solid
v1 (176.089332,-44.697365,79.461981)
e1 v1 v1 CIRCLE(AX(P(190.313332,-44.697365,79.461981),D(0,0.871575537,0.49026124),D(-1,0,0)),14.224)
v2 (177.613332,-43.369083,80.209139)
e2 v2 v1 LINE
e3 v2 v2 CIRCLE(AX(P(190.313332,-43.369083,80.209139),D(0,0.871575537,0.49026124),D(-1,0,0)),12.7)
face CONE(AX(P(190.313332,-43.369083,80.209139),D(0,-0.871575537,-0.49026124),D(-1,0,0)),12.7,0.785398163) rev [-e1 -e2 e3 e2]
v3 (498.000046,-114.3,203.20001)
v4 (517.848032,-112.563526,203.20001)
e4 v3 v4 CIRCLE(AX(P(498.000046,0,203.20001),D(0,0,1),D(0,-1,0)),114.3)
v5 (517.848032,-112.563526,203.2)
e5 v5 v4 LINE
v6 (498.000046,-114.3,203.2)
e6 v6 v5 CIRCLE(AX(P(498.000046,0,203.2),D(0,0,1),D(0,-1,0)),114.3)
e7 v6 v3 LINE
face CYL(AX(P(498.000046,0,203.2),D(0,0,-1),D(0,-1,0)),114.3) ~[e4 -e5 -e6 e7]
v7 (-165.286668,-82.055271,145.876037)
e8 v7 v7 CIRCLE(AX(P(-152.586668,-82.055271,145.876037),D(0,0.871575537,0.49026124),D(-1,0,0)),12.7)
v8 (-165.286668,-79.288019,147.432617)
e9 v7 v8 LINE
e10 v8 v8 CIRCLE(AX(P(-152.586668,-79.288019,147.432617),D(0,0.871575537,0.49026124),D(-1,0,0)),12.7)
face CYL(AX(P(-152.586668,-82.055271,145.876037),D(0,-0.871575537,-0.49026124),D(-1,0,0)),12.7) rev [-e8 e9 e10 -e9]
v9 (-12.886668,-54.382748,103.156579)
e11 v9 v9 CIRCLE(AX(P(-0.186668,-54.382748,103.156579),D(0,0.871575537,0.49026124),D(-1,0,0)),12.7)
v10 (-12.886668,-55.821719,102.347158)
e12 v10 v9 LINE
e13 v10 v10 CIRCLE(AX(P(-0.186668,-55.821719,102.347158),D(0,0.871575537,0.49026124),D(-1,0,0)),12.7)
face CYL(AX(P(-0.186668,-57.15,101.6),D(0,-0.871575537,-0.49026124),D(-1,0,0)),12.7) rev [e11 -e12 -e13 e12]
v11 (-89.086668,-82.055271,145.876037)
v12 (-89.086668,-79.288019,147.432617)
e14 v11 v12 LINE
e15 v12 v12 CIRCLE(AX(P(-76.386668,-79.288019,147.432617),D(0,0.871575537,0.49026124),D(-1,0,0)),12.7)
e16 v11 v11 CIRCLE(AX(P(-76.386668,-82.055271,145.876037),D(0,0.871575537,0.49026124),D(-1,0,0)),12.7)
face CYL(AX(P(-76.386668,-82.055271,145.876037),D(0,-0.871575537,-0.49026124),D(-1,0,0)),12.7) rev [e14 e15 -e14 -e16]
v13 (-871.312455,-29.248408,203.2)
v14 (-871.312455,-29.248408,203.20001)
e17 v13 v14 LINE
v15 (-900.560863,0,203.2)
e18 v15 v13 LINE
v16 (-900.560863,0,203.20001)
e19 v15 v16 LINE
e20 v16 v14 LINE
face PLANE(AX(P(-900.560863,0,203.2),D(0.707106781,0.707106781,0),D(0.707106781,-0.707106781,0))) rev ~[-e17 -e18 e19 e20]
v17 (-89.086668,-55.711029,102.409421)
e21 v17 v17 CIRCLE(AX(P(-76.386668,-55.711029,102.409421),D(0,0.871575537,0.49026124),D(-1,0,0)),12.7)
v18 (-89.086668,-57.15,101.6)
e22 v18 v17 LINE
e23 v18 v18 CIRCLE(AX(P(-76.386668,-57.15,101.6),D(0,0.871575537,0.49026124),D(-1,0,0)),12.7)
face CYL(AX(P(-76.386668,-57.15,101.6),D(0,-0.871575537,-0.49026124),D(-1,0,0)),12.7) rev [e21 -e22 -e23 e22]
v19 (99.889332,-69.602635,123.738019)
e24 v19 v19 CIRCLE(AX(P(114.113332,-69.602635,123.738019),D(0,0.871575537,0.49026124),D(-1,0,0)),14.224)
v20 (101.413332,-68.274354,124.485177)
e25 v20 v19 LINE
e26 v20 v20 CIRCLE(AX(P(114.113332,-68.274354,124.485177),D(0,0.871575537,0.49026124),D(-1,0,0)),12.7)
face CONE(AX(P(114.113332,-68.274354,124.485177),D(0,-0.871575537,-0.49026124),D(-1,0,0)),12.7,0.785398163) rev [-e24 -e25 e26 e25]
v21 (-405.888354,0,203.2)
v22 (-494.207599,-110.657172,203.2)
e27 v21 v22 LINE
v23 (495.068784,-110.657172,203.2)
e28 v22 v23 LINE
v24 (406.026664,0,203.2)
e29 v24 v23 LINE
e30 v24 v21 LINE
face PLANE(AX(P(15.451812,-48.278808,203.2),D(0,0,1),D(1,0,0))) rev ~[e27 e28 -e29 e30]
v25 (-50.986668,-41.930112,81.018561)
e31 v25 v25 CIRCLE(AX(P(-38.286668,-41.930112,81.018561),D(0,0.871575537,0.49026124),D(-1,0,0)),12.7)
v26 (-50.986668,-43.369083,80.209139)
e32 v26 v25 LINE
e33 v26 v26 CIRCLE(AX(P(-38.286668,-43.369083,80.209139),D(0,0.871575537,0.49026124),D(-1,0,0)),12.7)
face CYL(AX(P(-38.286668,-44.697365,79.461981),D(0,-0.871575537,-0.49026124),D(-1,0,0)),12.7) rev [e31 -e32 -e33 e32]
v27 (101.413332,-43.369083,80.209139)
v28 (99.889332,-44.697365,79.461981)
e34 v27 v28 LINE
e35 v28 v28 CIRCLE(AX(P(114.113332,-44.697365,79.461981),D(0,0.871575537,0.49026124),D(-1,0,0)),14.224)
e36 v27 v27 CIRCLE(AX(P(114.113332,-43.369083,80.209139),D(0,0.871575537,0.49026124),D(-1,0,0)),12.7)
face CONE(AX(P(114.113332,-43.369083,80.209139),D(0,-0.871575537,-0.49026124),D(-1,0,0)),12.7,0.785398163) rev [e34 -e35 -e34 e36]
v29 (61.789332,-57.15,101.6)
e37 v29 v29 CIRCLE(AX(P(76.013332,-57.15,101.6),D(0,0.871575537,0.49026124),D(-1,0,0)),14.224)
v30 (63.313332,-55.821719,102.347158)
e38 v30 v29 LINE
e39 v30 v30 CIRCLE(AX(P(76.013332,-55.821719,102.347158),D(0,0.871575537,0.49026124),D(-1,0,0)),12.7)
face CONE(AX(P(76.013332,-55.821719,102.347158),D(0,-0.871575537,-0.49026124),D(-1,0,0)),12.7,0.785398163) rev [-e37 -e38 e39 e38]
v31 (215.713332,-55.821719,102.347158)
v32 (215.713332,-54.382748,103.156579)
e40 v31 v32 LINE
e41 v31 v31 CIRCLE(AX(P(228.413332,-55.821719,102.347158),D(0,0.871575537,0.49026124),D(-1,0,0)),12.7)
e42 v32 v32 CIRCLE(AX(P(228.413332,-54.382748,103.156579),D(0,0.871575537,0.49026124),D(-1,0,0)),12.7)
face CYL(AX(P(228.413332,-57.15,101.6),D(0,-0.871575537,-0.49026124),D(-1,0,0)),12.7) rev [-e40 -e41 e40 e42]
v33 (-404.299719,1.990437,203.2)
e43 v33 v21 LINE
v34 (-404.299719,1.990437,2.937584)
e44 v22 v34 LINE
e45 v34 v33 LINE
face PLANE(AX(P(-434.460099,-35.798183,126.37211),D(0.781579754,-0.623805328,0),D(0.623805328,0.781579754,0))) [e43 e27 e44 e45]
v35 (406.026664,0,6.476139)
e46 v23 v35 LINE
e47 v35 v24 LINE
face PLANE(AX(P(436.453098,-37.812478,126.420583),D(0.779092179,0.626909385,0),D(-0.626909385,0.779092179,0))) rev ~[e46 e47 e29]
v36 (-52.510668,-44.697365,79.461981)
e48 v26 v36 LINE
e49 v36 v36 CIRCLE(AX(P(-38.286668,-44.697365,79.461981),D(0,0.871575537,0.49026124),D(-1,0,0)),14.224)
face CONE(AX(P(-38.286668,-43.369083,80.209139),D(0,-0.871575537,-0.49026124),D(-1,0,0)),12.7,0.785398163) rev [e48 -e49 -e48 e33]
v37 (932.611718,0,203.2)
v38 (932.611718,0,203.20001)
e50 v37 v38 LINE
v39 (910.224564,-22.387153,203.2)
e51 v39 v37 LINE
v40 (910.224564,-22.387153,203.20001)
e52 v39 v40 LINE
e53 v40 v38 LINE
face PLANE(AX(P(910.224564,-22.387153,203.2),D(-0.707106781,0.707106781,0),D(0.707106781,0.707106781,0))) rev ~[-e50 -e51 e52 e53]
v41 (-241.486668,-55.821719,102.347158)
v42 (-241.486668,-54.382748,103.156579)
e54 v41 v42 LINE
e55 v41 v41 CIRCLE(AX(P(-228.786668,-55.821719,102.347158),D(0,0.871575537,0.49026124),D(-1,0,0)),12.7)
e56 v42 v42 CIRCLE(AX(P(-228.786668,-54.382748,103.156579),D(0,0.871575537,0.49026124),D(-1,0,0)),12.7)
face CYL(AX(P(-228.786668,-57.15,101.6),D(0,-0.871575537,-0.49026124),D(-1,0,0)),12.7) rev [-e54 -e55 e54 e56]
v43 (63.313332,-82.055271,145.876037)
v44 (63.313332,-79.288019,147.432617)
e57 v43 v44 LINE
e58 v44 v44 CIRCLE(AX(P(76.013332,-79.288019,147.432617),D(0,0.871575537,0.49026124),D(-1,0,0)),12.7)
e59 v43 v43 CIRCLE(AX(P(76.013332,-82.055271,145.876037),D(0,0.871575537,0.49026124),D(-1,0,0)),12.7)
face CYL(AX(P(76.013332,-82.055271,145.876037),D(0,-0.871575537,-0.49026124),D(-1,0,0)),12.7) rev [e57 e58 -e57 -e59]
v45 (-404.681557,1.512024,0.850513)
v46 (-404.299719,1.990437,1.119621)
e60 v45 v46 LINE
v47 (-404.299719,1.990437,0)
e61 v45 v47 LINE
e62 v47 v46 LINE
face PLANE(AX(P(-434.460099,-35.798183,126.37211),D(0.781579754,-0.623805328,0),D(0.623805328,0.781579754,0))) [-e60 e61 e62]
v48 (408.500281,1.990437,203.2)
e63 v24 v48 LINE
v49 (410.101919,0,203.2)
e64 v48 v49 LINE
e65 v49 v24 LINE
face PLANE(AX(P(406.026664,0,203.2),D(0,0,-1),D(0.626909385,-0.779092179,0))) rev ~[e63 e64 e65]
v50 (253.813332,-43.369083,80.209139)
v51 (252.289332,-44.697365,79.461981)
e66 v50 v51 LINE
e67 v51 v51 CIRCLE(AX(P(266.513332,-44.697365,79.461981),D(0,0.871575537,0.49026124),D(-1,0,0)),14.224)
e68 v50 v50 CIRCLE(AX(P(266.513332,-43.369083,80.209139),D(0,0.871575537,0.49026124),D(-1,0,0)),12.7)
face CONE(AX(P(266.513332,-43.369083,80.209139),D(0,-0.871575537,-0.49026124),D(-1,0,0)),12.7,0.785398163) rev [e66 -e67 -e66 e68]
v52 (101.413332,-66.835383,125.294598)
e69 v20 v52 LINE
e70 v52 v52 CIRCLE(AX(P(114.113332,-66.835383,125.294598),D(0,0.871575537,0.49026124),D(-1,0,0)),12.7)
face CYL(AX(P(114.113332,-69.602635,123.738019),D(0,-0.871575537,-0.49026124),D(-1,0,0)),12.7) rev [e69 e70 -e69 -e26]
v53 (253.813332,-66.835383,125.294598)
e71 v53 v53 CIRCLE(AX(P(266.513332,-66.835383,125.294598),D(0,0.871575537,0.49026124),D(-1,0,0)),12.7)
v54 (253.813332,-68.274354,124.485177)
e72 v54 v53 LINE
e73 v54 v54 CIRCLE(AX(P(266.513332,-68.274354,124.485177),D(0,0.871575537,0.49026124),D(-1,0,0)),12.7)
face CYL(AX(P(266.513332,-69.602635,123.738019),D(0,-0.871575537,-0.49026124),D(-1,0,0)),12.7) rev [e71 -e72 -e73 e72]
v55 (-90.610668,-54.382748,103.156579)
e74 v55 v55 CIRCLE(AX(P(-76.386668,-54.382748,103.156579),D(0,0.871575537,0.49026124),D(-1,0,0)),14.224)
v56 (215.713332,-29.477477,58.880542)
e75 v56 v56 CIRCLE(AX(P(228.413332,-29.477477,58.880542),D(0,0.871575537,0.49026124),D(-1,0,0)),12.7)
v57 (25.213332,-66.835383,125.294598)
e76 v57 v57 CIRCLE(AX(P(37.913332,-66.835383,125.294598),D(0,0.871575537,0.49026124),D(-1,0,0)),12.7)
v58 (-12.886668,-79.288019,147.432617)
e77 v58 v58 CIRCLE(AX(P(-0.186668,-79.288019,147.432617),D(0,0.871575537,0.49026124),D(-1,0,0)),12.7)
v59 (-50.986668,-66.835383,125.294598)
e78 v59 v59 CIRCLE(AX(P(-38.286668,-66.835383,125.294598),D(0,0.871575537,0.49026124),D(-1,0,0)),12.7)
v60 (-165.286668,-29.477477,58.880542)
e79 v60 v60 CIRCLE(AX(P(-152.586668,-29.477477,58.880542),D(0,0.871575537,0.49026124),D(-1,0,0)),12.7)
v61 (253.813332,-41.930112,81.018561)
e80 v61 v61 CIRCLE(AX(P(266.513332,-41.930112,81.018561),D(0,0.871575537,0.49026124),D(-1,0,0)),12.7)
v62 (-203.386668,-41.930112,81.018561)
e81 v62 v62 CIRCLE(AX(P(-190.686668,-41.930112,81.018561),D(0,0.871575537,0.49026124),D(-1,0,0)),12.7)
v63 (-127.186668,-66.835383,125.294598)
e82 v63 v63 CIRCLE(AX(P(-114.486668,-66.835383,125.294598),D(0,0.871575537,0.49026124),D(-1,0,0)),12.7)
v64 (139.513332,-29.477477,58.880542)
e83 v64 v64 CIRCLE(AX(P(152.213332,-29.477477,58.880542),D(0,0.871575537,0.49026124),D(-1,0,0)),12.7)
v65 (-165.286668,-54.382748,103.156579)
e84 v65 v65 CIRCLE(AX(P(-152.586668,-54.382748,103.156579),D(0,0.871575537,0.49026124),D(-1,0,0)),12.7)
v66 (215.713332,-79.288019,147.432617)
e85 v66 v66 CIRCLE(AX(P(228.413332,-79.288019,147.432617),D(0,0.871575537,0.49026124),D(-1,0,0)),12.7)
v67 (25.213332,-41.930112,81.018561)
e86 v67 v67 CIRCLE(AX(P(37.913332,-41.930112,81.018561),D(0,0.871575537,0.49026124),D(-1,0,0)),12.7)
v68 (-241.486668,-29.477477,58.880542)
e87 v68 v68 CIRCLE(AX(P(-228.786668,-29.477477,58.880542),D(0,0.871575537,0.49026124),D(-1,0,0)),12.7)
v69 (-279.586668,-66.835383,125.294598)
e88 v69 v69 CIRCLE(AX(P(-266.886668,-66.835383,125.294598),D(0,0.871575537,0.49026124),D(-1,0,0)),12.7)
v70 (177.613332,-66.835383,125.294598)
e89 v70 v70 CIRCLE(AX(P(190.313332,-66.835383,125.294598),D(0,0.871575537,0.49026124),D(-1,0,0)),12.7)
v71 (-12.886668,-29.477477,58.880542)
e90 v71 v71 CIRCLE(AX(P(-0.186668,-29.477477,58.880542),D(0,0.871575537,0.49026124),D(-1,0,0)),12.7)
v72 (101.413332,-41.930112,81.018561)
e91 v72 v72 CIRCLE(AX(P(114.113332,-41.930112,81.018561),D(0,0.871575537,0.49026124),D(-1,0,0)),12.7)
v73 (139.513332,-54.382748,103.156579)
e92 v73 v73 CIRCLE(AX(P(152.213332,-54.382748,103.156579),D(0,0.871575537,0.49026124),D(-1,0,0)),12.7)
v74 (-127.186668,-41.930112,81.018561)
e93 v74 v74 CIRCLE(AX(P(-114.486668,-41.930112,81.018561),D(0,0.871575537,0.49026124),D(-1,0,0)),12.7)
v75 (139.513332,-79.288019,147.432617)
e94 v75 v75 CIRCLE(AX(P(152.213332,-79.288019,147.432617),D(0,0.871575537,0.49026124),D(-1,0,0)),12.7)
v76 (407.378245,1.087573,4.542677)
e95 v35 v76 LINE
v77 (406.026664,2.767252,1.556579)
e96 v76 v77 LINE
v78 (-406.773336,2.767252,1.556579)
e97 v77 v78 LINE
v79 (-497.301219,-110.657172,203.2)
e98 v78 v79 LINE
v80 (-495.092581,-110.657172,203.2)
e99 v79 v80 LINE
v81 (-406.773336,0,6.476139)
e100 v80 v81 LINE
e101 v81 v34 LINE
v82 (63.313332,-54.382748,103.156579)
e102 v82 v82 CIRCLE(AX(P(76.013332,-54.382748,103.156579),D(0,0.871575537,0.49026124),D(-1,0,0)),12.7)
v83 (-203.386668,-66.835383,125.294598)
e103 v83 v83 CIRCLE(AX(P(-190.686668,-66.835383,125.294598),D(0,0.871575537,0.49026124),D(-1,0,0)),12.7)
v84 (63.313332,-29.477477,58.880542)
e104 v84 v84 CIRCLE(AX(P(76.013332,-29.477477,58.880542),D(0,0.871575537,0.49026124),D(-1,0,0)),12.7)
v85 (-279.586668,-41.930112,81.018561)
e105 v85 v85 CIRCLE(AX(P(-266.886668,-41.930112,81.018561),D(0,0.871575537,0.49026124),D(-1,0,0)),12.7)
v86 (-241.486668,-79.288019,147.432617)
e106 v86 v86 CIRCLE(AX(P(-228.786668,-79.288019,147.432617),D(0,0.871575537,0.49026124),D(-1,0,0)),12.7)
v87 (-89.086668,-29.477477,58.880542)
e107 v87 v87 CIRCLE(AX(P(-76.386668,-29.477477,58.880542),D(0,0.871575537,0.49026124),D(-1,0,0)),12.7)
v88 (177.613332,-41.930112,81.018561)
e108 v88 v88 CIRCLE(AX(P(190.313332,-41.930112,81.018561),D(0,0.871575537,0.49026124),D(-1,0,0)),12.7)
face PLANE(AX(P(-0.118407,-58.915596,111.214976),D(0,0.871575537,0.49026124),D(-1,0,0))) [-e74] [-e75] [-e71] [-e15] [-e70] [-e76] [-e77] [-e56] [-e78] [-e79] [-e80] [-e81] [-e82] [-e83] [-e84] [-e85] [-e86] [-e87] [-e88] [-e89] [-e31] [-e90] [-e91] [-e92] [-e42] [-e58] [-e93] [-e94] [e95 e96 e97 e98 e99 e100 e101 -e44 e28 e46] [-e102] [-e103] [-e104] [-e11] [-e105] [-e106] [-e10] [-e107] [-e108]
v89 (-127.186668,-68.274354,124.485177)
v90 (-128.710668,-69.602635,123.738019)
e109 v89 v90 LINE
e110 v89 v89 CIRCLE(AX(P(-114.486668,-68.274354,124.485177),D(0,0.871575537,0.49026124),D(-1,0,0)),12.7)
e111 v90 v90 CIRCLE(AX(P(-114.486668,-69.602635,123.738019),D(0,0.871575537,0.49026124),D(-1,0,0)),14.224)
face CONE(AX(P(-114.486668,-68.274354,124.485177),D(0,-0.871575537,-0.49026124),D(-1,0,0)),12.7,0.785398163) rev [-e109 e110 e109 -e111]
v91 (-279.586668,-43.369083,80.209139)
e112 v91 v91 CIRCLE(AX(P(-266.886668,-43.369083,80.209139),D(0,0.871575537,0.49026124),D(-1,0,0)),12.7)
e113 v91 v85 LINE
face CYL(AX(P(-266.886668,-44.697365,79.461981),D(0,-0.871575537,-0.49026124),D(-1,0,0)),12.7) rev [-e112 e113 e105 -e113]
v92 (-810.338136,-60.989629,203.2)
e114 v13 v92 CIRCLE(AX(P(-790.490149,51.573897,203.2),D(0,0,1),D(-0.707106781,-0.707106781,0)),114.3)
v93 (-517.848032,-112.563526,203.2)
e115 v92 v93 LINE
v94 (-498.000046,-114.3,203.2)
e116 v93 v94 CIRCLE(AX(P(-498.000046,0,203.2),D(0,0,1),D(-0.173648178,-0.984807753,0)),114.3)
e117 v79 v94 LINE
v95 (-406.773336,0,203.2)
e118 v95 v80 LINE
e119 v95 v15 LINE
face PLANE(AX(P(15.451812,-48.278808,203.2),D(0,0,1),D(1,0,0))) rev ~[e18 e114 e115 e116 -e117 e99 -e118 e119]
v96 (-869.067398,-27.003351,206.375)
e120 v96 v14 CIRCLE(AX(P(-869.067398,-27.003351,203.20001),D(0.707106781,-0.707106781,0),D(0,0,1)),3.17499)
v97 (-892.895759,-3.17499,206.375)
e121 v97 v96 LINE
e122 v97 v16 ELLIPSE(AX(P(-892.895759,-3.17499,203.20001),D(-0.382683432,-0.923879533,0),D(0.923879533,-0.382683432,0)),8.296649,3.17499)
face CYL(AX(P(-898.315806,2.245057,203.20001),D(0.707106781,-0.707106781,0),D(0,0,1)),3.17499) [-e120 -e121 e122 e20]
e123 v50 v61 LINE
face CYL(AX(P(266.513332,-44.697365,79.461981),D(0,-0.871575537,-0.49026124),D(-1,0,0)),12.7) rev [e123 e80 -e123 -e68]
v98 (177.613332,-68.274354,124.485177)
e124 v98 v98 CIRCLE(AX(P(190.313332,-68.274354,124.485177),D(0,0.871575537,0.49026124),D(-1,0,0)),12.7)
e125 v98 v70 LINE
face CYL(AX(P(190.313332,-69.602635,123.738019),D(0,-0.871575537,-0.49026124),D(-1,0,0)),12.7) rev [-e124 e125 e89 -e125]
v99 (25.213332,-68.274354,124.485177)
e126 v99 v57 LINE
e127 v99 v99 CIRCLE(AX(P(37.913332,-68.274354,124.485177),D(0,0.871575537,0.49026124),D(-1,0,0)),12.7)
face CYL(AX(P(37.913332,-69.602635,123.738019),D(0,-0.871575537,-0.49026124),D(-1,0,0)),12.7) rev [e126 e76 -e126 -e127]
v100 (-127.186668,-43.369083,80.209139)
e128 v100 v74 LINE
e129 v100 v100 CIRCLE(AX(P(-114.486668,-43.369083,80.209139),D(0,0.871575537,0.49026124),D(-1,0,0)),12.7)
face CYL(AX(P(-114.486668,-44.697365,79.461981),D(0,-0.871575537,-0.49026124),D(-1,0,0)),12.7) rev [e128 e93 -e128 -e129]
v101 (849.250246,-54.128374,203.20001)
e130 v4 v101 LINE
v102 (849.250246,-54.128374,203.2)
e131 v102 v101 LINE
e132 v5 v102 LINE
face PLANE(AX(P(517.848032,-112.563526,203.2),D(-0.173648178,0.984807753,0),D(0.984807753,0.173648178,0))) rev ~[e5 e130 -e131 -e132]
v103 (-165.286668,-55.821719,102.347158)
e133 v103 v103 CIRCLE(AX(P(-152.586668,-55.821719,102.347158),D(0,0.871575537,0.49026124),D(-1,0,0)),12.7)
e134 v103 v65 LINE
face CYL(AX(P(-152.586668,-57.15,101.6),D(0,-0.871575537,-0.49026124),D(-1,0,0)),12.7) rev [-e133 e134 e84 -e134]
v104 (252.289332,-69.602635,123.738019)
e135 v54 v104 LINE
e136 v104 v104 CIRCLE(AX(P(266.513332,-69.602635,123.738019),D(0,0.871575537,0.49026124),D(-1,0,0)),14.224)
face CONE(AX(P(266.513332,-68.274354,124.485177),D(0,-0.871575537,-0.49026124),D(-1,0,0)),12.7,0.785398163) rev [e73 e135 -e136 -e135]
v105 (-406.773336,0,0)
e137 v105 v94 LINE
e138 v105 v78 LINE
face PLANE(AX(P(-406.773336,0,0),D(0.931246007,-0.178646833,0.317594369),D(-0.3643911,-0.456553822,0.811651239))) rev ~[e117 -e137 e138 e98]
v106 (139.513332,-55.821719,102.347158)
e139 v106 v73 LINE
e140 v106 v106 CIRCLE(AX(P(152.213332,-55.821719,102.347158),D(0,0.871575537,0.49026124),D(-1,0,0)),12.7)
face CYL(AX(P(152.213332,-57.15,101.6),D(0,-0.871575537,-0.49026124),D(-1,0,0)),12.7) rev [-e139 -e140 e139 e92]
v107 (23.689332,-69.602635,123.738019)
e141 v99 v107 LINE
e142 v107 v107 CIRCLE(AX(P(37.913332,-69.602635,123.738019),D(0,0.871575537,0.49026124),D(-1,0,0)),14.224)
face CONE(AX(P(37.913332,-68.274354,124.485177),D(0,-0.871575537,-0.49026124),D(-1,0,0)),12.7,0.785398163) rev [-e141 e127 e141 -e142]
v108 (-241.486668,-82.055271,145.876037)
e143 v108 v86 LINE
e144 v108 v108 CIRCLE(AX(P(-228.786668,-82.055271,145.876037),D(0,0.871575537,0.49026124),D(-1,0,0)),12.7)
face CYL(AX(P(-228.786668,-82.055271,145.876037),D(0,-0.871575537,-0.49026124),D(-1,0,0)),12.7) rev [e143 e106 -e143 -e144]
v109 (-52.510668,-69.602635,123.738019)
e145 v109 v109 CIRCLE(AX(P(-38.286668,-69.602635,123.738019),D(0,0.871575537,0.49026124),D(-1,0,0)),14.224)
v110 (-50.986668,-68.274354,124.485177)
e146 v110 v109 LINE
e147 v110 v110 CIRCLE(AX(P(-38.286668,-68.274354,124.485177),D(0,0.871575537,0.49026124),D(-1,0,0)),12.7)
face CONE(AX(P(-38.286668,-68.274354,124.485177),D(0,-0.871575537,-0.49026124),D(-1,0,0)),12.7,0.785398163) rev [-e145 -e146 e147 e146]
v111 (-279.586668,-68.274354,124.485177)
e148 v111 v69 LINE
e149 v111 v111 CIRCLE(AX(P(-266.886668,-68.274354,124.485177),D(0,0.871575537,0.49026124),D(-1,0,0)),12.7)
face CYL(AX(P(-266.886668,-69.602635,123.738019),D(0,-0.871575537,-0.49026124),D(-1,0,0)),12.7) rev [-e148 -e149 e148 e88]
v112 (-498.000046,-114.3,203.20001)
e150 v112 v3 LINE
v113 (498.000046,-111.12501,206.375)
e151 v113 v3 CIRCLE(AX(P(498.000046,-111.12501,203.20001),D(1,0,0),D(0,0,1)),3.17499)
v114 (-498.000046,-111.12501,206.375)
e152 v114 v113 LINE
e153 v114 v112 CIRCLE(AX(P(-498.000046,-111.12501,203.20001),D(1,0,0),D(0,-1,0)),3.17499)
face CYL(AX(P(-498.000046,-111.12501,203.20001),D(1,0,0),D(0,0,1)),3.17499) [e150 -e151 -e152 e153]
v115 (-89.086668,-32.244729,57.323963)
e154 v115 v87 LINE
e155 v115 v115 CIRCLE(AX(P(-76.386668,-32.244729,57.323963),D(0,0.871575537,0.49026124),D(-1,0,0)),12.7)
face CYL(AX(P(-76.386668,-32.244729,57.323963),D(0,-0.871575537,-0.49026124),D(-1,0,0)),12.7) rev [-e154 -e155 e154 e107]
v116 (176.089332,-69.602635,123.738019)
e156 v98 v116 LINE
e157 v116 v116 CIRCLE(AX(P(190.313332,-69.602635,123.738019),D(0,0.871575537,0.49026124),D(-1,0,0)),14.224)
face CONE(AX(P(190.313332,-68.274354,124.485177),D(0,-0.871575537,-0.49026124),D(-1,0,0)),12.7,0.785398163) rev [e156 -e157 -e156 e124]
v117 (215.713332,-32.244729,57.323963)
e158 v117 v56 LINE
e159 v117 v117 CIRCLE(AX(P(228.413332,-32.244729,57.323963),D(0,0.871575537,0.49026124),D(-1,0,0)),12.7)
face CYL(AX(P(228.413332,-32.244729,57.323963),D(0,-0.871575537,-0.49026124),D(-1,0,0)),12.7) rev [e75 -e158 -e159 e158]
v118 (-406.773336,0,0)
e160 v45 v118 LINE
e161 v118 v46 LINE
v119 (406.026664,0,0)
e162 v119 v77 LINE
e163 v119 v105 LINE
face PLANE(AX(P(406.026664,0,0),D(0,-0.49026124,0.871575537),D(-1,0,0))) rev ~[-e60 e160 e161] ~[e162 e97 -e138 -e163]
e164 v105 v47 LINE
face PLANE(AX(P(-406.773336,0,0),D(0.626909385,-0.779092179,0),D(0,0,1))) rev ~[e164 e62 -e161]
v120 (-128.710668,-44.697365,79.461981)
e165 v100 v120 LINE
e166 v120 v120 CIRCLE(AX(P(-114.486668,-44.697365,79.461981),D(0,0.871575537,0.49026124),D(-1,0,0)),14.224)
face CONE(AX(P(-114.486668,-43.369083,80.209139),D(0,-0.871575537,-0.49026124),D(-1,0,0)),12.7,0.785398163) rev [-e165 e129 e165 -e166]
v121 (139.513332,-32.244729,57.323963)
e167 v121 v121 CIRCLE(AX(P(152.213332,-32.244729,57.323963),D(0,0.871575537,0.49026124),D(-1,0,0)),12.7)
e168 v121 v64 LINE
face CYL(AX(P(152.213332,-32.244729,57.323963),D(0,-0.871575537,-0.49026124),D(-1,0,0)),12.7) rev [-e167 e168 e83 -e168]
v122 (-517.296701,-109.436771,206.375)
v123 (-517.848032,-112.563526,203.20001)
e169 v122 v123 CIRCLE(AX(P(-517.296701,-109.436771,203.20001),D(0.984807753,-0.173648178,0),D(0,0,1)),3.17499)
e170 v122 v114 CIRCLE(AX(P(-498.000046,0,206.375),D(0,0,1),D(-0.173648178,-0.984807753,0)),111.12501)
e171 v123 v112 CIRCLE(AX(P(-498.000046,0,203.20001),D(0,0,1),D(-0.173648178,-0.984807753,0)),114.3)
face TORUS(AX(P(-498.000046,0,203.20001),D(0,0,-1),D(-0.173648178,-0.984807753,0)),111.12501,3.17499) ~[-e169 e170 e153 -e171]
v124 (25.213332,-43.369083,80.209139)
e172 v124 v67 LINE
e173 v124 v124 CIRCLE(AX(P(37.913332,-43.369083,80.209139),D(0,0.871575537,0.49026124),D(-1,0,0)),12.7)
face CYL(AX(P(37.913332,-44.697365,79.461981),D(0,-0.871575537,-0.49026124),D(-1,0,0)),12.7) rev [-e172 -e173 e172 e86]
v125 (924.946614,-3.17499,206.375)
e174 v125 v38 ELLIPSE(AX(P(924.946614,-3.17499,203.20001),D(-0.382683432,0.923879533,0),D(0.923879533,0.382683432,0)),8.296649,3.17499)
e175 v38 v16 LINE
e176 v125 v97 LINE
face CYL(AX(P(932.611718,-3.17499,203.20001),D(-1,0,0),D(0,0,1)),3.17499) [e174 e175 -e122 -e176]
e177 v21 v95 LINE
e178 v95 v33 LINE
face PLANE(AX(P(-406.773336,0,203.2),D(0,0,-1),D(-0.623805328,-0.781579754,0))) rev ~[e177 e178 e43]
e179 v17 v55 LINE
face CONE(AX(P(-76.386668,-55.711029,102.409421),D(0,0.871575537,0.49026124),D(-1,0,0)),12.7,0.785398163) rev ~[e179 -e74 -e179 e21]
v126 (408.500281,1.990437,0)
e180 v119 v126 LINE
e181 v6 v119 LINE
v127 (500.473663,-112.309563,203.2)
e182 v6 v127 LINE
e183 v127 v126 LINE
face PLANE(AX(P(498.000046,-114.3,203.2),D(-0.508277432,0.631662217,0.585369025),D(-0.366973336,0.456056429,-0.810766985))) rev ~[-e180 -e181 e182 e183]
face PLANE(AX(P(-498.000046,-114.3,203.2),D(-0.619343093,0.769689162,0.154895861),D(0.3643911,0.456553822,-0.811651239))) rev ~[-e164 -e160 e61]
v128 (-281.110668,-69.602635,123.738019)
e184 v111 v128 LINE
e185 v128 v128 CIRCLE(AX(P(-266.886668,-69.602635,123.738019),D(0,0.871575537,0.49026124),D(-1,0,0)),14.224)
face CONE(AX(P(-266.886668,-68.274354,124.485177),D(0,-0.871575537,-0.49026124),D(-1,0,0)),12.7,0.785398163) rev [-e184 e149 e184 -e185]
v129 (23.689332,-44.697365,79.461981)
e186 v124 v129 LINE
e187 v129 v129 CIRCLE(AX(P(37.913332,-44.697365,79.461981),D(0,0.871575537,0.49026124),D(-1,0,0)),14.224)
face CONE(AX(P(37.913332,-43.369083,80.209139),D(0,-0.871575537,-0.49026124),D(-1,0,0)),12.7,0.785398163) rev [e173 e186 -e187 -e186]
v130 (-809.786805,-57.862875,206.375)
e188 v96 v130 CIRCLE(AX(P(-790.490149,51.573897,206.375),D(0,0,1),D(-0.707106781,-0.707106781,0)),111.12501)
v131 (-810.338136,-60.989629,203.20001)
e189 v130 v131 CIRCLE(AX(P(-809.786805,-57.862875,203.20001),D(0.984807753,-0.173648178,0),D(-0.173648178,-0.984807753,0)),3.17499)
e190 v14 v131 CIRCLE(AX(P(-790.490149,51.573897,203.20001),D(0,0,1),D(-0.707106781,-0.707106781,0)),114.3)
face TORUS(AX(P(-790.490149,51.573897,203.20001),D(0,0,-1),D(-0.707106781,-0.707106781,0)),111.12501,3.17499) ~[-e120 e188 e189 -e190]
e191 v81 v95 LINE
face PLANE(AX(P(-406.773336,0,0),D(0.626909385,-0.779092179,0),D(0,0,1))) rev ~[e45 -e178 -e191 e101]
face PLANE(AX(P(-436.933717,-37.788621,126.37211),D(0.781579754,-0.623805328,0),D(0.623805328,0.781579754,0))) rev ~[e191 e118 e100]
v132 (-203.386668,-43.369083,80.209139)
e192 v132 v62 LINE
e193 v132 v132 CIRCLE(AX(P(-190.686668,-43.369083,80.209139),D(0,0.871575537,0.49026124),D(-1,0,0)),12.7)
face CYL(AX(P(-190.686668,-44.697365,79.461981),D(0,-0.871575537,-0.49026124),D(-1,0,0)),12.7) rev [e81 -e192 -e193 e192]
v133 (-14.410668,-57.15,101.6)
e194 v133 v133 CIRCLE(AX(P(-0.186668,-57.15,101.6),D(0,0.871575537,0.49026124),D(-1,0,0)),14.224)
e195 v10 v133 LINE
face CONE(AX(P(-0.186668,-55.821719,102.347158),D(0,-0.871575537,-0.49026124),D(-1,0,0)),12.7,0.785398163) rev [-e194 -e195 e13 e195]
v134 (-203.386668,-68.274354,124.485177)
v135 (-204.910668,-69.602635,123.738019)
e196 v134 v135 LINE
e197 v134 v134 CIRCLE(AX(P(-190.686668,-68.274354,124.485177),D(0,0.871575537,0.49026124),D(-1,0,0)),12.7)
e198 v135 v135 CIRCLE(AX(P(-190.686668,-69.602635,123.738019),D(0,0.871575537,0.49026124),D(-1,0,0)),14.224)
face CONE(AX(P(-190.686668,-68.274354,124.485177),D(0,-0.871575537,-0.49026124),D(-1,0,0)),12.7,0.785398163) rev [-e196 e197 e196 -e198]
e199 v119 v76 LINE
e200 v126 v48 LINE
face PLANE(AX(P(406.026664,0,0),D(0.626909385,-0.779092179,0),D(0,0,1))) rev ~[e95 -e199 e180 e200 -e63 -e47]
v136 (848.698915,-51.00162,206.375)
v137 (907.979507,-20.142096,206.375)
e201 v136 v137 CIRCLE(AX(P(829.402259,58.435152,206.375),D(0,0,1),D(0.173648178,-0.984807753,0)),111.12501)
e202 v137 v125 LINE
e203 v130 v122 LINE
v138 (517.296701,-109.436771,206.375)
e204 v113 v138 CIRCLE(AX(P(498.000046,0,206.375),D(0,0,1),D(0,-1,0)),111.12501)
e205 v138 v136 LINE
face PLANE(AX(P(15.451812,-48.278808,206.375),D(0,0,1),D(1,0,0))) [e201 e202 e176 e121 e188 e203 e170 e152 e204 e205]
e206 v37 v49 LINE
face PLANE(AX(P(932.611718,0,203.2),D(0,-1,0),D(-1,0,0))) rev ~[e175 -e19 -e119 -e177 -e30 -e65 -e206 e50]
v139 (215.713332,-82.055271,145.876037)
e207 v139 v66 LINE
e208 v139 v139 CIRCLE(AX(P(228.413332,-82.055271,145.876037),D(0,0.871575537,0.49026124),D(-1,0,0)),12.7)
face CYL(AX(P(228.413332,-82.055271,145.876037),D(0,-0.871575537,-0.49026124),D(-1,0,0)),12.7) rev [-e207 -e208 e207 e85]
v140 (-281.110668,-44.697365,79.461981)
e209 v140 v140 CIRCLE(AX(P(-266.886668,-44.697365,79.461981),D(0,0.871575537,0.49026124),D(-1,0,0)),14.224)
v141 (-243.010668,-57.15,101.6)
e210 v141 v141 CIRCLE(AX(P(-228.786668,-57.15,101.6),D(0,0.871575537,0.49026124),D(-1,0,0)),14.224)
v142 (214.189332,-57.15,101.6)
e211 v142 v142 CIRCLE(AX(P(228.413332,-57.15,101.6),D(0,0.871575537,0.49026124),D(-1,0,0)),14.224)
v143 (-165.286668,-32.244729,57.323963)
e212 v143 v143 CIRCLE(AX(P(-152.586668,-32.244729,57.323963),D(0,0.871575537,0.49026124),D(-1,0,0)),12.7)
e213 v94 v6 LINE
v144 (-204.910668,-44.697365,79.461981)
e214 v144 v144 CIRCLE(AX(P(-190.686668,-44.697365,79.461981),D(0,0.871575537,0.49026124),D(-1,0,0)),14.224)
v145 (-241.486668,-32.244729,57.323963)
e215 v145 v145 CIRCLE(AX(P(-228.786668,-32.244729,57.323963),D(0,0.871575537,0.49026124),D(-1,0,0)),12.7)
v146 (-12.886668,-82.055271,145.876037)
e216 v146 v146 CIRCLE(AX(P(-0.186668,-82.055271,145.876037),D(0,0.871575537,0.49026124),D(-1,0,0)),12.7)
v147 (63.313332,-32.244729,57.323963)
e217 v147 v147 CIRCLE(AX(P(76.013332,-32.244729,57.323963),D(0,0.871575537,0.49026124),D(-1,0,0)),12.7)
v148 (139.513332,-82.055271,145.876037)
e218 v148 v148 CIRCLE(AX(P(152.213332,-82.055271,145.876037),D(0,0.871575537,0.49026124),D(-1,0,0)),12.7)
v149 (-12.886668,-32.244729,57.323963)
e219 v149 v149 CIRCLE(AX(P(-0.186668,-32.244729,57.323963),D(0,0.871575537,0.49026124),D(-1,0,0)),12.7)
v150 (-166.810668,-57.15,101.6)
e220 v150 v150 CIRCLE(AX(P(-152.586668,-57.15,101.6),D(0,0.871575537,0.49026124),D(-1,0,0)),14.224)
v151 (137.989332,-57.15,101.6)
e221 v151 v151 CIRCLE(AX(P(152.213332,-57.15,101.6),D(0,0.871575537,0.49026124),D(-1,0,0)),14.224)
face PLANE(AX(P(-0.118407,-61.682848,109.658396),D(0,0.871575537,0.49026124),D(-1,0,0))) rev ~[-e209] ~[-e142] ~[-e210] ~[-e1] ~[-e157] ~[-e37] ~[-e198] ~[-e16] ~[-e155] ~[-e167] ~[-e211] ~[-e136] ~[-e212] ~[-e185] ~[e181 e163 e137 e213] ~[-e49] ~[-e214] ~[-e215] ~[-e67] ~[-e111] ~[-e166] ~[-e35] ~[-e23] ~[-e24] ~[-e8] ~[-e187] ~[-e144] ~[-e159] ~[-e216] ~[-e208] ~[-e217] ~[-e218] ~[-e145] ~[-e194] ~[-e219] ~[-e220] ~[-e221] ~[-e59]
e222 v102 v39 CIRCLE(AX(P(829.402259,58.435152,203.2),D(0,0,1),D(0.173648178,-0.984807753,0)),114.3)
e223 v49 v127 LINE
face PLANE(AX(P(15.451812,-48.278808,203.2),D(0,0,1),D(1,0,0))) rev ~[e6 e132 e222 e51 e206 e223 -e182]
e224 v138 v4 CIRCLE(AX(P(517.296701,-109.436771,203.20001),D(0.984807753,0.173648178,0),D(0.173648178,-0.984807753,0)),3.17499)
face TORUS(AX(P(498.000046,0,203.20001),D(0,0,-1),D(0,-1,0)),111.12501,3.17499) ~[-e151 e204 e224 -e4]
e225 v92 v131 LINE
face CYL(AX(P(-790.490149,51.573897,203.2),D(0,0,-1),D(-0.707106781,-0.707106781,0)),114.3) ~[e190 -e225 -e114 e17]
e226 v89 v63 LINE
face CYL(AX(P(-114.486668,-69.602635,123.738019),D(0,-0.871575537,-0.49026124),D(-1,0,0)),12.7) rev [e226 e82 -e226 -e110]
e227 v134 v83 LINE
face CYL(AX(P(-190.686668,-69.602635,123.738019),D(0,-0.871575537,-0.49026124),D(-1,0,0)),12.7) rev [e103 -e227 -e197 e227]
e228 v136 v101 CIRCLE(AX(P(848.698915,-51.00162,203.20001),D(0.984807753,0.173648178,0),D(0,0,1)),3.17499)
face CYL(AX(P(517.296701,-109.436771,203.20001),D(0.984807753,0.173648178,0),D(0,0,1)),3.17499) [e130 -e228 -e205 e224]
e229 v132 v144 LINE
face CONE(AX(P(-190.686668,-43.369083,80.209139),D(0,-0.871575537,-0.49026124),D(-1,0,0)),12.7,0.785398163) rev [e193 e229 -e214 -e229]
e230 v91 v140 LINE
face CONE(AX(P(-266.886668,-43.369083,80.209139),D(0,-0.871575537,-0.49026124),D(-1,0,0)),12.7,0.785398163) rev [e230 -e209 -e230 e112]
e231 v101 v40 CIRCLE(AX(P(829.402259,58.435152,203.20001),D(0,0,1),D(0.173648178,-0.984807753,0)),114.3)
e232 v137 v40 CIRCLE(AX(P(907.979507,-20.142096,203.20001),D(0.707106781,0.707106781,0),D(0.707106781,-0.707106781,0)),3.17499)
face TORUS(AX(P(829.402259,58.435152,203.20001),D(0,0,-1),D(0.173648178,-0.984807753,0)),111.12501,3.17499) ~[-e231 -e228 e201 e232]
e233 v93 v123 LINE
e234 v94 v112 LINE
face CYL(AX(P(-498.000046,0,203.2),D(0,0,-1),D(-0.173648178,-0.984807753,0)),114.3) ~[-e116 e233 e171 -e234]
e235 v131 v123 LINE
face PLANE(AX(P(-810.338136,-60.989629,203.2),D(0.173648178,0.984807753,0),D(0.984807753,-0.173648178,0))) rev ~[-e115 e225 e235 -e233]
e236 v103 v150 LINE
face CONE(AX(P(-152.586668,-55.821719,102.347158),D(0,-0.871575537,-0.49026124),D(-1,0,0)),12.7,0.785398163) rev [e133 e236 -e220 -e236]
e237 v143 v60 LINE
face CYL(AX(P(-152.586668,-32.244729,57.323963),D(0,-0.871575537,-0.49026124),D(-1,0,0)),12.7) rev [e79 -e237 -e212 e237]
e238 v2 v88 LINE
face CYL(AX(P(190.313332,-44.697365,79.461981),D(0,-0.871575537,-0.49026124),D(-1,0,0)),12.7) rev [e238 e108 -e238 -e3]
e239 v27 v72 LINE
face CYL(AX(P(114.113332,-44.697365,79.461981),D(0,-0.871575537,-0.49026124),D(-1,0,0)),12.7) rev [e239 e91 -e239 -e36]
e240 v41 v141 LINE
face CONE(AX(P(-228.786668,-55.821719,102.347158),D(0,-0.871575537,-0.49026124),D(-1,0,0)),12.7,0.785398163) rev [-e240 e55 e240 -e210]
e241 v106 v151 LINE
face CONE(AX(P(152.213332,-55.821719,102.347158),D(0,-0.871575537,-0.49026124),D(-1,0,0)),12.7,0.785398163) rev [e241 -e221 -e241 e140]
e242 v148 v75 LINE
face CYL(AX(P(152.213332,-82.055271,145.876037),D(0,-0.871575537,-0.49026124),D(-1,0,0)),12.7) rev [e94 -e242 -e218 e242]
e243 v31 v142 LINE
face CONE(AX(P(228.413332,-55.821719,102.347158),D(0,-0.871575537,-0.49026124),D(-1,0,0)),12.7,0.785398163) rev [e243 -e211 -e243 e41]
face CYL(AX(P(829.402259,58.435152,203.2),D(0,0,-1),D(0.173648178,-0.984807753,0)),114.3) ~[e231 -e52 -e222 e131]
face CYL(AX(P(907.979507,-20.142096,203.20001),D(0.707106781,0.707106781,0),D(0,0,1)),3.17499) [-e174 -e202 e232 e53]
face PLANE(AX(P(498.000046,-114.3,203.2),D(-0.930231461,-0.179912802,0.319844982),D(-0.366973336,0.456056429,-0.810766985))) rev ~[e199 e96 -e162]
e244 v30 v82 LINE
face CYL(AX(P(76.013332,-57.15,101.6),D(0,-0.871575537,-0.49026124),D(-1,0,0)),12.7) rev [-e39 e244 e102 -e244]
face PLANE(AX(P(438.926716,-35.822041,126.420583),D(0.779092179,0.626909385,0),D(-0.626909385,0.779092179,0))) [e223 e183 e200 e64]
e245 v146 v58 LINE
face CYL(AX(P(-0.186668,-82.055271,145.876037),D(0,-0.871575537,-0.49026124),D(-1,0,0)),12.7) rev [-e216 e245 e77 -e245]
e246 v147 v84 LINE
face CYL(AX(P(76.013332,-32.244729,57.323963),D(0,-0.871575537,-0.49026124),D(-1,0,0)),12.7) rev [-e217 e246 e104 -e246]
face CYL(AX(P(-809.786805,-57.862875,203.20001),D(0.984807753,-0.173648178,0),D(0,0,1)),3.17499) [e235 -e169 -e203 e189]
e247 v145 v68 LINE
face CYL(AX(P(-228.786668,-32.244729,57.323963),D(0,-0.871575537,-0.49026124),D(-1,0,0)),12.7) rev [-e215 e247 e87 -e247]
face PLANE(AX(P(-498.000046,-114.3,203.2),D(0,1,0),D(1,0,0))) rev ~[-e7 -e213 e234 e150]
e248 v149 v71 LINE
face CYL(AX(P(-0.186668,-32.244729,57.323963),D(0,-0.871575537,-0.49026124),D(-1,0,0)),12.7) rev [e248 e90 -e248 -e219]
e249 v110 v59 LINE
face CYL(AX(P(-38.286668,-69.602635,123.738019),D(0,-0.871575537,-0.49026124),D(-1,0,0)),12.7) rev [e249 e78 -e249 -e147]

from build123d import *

# Parameters (mm, degrees)
F9_R      = 12.7
F10_DEPTH = 3.175
F11_SIZE  = 1.524
F12_DEPTH = 3.175
F13_R     = 3.17499
F14_DEPTH = 3.175


# Not quite as in the source:
# - a fillet or chamfer is up to 0.001 mm smaller than in the source, because OpenCascade refuses the exact size


with BuildPart() as f10:
    # F9 (on 3pt) → F10 (new body)
    with BuildSketch(Plane(origin=(0, 0, 0), x_dir=(-1, 0, 0), z_dir=(0, 0.8715755371, 0.4902612396))):
        Polygon((-406.0266635338, 0), (406.7733364662, 0), (498.000045759, 233.1410088337), (-498.000045759, 233.1410088337), align=None)
        with Locations((-266.5133317669, 91.1705044169)):
            Circle(F9_R, mode=Mode.SUBTRACT)
        with Locations((-228.4133317669, 65.7705044169)):
            Circle(F9_R, mode=Mode.SUBTRACT)
        with Locations((-152.2133317669, 65.7705044169)):
            Circle(F9_R, mode=Mode.SUBTRACT)
        with Locations((-76.0133317669, 65.7705044169)):
            Circle(F9_R, mode=Mode.SUBTRACT)
        with Locations((-190.3133317669, 91.1705044169)):
            Circle(F9_R, mode=Mode.SUBTRACT)
        with Locations((-114.1133317669, 91.1705044169)):
            Circle(F9_R, mode=Mode.SUBTRACT)
        with Locations((-37.9133317669, 91.1705044169)):
            Circle(F9_R, mode=Mode.SUBTRACT)
        with Locations((0.1866682331, 65.7705044169)):
            Circle(F9_R, mode=Mode.SUBTRACT)
        with Locations((76.3866682331, 65.7705044169)):
            Circle(F9_R, mode=Mode.SUBTRACT)
        with Locations((152.5866682331, 65.7705044169)):
            Circle(F9_R, mode=Mode.SUBTRACT)
        with Locations((228.7866682331, 65.7705044169)):
            Circle(F9_R, mode=Mode.SUBTRACT)
        with Locations((38.2866682331, 91.1705044169)):
            Circle(F9_R, mode=Mode.SUBTRACT)
        with Locations((114.4866682331, 91.1705044169)):
            Circle(F9_R, mode=Mode.SUBTRACT)
        with Locations((190.6866682331, 91.1705044169)):
            Circle(F9_R, mode=Mode.SUBTRACT)
        with Locations((266.8866682331, 91.1705044169)):
            Circle(F9_R, mode=Mode.SUBTRACT)
        with Locations((-266.5133317669, 141.9705044169)):
            Circle(F9_R, mode=Mode.SUBTRACT)
        with Locations((-228.4133317669, 116.5705044169)):
            Circle(F9_R, mode=Mode.SUBTRACT)
        with Locations((-152.2133317669, 116.5705044169)):
            Circle(F9_R, mode=Mode.SUBTRACT)
        with Locations((-190.3133317669, 141.9705044169)):
            Circle(F9_R, mode=Mode.SUBTRACT)
        with Locations((-76.0133317669, 116.5705044169)):
            Circle(F9_R, mode=Mode.SUBTRACT)
        with Locations((-114.1133317669, 141.9705044169)):
            Circle(F9_R, mode=Mode.SUBTRACT)
        with Locations((-37.9133317669, 141.9705044169)):
            Circle(F9_R, mode=Mode.SUBTRACT)
        with Locations((-228.4133317669, 167.3705044169)):
            Circle(F9_R, mode=Mode.SUBTRACT)
        with Locations((-152.2133317669, 167.3705044169)):
            Circle(F9_R, mode=Mode.SUBTRACT)
        with Locations((-76.0133317669, 167.3705044169)):
            Circle(F9_R, mode=Mode.SUBTRACT)
        with Locations((0.1866682331, 116.5705044169)):
            Circle(F9_R, mode=Mode.SUBTRACT)
        with Locations((76.3866682331, 116.5705044169)):
            Circle(F9_R, mode=Mode.SUBTRACT)
        with Locations((38.2866682331, 141.9705044169)):
            Circle(F9_R, mode=Mode.SUBTRACT)
        with Locations((114.4866682331, 141.9705044169)):
            Circle(F9_R, mode=Mode.SUBTRACT)
        with Locations((152.5866682331, 116.5705044169)):
            Circle(F9_R, mode=Mode.SUBTRACT)
        with Locations((228.7866682331, 116.5705044169)):
            Circle(F9_R, mode=Mode.SUBTRACT)
        with Locations((190.6866682331, 141.9705044169)):
            Circle(F9_R, mode=Mode.SUBTRACT)
        with Locations((0.1866682331, 167.3705044169)):
            Circle(F9_R, mode=Mode.SUBTRACT)
        with Locations((76.3866682331, 167.3705044169)):
            Circle(F9_R, mode=Mode.SUBTRACT)
        with Locations((152.5866682331, 167.3705044169)):
            Circle(F9_R, mode=Mode.SUBTRACT)
        with Locations((228.7866682331, 167.3705044169)):
            Circle(F9_R, mode=Mode.SUBTRACT)
        with Locations((266.8866682331, 141.9705044169)):
            Circle(F9_R, mode=Mode.SUBTRACT)
    extrude(amount=F10_DEPTH)

    # F11
    f11_edges = [f10.edges().sort_by_distance(p)[0] for p in [
        (126.813332, -44.697365, 79.461981),
        (-254.186668, -69.602635, 123.738019),
        (-177.986668, -69.602635, 123.738019),
        (-216.086668, -57.15, 101.6),
        (-254.186668, -44.697365, 79.461981),
        (-177.986668, -44.697365, 79.461981),
        (-139.886668, -57.15, 101.6),
        (-101.786668, -69.602635, 123.738019),
        (-101.786668, -44.697365, 79.461981),
        (-63.686668, -54.382748, 103.156579),
        (-25.586668, -69.602635, 123.738019),
        (-25.586668, -44.697365, 79.461981),
        (12.513332, -57.15, 101.6),
        (50.613332, -69.602635, 123.738019),
        (50.613332, -44.697365, 79.461981),
        (88.713332, -57.15, 101.6),
        (126.813332, -69.602635, 123.738019),
        (164.913332, -57.15, 101.6),
        (203.013332, -69.602635, 123.738019),
        (279.213332, -69.602635, 123.738019),
        (241.113332, -57.15, 101.6),
        (203.013332, -44.697365, 79.461981),
        (279.213332, -44.697365, 79.461981),
    ]]
    chamfer(f11_edges, length=F11_SIZE)

    # F2 (on offset) → F12 (join)
    with BuildSketch(Plane.XY.offset(203.2)):
        with BuildLine():
            Line((-498.000045759, -114.3), (498.000045759, -114.3))
            ThreePointArc((498.000045759, -114.3), (507.961947155, -113.8650539919), (517.8480324663, -112.5635261693))
            Line((517.8480324663, -112.5635261693), (849.2502458829, -54.1283744775))
            ThreePointArc((849.2502458829, -54.1283744775), (882.1801256683, -42.9501865404), (910.2245642651, -22.3871533978))
            Line((910.2245642651, -22.3871533978), (932.6117176629, 0))
            Line((932.6117176629, 0), (-900.5608627483, 0))
            Line((-900.5608627483, 0), (-871.3124545275, -29.2484082208))
            ThreePointArc((-871.3124545275, -29.2484082208), (-843.2680159306, -49.8114413635), (-810.3381361452, -60.9896293005))
            Line((-810.3381361452, -60.9896293005), (-517.8480324663, -112.5635261693))
            ThreePointArc((-517.8480324663, -112.5635261693), (-507.961947155, -113.8650539919), (-498.000045759, -114.3))
        make_face()
    extrude(amount=F12_DEPTH)

    # F13 (radius 3.175 in the source; OpenCascade refuses exactly that, so slightly less here)
    f13_edges = [f10.edges().sort_by_distance(p)[0] for p in [
        (-843.268016, -49.811441, 206.375),
        (-664.093084, -86.776578, 206.375),
        (-507.961947, -113.865054, 206.375),
        (0, -114.3, 206.375),
        (507.961947, -113.865054, 206.375),
        (683.549139, -83.34595, 206.375),
        (882.180126, -42.950187, 206.375),
        (921.418141, -11.193577, 206.375),
        (16.025427, 0, 206.375),
        (-885.936659, -14.624204, 206.375),
    ]]
    fillet(f13_edges, radius=F13_R)

    # F6 (on 3pt) + F4 (on 3pt) → F14 (join)
    with BuildSketch(Plane(origin=(246.4519411848, 198.3116236809, 0), x_dir=(-0.6269093852, 0.7790921786, 0), z_dir=(0.7790921786, 0.6269093852, 0))):
        Polygon((-254.5419260156, 203.2), (-401.2511385345, 203.2), (-254.5419260156, 0), align=None)
    with BuildSketch(Plane(origin=(-248.484372052, 198.3238107874, 0), x_dir=(0.6238053284, 0.7815797543, 0), z_dir=(0.7815797543, -0.6238053284, 0))):
        Polygon((-253.7473747264, 203.2), (-399.9896479869, 203.2), (-253.7473747264, 0), align=None)
    extrude(amount=F14_DEPTH, dir=(0.7790921786, 0.6269093852, 0))


solid = f10.part
